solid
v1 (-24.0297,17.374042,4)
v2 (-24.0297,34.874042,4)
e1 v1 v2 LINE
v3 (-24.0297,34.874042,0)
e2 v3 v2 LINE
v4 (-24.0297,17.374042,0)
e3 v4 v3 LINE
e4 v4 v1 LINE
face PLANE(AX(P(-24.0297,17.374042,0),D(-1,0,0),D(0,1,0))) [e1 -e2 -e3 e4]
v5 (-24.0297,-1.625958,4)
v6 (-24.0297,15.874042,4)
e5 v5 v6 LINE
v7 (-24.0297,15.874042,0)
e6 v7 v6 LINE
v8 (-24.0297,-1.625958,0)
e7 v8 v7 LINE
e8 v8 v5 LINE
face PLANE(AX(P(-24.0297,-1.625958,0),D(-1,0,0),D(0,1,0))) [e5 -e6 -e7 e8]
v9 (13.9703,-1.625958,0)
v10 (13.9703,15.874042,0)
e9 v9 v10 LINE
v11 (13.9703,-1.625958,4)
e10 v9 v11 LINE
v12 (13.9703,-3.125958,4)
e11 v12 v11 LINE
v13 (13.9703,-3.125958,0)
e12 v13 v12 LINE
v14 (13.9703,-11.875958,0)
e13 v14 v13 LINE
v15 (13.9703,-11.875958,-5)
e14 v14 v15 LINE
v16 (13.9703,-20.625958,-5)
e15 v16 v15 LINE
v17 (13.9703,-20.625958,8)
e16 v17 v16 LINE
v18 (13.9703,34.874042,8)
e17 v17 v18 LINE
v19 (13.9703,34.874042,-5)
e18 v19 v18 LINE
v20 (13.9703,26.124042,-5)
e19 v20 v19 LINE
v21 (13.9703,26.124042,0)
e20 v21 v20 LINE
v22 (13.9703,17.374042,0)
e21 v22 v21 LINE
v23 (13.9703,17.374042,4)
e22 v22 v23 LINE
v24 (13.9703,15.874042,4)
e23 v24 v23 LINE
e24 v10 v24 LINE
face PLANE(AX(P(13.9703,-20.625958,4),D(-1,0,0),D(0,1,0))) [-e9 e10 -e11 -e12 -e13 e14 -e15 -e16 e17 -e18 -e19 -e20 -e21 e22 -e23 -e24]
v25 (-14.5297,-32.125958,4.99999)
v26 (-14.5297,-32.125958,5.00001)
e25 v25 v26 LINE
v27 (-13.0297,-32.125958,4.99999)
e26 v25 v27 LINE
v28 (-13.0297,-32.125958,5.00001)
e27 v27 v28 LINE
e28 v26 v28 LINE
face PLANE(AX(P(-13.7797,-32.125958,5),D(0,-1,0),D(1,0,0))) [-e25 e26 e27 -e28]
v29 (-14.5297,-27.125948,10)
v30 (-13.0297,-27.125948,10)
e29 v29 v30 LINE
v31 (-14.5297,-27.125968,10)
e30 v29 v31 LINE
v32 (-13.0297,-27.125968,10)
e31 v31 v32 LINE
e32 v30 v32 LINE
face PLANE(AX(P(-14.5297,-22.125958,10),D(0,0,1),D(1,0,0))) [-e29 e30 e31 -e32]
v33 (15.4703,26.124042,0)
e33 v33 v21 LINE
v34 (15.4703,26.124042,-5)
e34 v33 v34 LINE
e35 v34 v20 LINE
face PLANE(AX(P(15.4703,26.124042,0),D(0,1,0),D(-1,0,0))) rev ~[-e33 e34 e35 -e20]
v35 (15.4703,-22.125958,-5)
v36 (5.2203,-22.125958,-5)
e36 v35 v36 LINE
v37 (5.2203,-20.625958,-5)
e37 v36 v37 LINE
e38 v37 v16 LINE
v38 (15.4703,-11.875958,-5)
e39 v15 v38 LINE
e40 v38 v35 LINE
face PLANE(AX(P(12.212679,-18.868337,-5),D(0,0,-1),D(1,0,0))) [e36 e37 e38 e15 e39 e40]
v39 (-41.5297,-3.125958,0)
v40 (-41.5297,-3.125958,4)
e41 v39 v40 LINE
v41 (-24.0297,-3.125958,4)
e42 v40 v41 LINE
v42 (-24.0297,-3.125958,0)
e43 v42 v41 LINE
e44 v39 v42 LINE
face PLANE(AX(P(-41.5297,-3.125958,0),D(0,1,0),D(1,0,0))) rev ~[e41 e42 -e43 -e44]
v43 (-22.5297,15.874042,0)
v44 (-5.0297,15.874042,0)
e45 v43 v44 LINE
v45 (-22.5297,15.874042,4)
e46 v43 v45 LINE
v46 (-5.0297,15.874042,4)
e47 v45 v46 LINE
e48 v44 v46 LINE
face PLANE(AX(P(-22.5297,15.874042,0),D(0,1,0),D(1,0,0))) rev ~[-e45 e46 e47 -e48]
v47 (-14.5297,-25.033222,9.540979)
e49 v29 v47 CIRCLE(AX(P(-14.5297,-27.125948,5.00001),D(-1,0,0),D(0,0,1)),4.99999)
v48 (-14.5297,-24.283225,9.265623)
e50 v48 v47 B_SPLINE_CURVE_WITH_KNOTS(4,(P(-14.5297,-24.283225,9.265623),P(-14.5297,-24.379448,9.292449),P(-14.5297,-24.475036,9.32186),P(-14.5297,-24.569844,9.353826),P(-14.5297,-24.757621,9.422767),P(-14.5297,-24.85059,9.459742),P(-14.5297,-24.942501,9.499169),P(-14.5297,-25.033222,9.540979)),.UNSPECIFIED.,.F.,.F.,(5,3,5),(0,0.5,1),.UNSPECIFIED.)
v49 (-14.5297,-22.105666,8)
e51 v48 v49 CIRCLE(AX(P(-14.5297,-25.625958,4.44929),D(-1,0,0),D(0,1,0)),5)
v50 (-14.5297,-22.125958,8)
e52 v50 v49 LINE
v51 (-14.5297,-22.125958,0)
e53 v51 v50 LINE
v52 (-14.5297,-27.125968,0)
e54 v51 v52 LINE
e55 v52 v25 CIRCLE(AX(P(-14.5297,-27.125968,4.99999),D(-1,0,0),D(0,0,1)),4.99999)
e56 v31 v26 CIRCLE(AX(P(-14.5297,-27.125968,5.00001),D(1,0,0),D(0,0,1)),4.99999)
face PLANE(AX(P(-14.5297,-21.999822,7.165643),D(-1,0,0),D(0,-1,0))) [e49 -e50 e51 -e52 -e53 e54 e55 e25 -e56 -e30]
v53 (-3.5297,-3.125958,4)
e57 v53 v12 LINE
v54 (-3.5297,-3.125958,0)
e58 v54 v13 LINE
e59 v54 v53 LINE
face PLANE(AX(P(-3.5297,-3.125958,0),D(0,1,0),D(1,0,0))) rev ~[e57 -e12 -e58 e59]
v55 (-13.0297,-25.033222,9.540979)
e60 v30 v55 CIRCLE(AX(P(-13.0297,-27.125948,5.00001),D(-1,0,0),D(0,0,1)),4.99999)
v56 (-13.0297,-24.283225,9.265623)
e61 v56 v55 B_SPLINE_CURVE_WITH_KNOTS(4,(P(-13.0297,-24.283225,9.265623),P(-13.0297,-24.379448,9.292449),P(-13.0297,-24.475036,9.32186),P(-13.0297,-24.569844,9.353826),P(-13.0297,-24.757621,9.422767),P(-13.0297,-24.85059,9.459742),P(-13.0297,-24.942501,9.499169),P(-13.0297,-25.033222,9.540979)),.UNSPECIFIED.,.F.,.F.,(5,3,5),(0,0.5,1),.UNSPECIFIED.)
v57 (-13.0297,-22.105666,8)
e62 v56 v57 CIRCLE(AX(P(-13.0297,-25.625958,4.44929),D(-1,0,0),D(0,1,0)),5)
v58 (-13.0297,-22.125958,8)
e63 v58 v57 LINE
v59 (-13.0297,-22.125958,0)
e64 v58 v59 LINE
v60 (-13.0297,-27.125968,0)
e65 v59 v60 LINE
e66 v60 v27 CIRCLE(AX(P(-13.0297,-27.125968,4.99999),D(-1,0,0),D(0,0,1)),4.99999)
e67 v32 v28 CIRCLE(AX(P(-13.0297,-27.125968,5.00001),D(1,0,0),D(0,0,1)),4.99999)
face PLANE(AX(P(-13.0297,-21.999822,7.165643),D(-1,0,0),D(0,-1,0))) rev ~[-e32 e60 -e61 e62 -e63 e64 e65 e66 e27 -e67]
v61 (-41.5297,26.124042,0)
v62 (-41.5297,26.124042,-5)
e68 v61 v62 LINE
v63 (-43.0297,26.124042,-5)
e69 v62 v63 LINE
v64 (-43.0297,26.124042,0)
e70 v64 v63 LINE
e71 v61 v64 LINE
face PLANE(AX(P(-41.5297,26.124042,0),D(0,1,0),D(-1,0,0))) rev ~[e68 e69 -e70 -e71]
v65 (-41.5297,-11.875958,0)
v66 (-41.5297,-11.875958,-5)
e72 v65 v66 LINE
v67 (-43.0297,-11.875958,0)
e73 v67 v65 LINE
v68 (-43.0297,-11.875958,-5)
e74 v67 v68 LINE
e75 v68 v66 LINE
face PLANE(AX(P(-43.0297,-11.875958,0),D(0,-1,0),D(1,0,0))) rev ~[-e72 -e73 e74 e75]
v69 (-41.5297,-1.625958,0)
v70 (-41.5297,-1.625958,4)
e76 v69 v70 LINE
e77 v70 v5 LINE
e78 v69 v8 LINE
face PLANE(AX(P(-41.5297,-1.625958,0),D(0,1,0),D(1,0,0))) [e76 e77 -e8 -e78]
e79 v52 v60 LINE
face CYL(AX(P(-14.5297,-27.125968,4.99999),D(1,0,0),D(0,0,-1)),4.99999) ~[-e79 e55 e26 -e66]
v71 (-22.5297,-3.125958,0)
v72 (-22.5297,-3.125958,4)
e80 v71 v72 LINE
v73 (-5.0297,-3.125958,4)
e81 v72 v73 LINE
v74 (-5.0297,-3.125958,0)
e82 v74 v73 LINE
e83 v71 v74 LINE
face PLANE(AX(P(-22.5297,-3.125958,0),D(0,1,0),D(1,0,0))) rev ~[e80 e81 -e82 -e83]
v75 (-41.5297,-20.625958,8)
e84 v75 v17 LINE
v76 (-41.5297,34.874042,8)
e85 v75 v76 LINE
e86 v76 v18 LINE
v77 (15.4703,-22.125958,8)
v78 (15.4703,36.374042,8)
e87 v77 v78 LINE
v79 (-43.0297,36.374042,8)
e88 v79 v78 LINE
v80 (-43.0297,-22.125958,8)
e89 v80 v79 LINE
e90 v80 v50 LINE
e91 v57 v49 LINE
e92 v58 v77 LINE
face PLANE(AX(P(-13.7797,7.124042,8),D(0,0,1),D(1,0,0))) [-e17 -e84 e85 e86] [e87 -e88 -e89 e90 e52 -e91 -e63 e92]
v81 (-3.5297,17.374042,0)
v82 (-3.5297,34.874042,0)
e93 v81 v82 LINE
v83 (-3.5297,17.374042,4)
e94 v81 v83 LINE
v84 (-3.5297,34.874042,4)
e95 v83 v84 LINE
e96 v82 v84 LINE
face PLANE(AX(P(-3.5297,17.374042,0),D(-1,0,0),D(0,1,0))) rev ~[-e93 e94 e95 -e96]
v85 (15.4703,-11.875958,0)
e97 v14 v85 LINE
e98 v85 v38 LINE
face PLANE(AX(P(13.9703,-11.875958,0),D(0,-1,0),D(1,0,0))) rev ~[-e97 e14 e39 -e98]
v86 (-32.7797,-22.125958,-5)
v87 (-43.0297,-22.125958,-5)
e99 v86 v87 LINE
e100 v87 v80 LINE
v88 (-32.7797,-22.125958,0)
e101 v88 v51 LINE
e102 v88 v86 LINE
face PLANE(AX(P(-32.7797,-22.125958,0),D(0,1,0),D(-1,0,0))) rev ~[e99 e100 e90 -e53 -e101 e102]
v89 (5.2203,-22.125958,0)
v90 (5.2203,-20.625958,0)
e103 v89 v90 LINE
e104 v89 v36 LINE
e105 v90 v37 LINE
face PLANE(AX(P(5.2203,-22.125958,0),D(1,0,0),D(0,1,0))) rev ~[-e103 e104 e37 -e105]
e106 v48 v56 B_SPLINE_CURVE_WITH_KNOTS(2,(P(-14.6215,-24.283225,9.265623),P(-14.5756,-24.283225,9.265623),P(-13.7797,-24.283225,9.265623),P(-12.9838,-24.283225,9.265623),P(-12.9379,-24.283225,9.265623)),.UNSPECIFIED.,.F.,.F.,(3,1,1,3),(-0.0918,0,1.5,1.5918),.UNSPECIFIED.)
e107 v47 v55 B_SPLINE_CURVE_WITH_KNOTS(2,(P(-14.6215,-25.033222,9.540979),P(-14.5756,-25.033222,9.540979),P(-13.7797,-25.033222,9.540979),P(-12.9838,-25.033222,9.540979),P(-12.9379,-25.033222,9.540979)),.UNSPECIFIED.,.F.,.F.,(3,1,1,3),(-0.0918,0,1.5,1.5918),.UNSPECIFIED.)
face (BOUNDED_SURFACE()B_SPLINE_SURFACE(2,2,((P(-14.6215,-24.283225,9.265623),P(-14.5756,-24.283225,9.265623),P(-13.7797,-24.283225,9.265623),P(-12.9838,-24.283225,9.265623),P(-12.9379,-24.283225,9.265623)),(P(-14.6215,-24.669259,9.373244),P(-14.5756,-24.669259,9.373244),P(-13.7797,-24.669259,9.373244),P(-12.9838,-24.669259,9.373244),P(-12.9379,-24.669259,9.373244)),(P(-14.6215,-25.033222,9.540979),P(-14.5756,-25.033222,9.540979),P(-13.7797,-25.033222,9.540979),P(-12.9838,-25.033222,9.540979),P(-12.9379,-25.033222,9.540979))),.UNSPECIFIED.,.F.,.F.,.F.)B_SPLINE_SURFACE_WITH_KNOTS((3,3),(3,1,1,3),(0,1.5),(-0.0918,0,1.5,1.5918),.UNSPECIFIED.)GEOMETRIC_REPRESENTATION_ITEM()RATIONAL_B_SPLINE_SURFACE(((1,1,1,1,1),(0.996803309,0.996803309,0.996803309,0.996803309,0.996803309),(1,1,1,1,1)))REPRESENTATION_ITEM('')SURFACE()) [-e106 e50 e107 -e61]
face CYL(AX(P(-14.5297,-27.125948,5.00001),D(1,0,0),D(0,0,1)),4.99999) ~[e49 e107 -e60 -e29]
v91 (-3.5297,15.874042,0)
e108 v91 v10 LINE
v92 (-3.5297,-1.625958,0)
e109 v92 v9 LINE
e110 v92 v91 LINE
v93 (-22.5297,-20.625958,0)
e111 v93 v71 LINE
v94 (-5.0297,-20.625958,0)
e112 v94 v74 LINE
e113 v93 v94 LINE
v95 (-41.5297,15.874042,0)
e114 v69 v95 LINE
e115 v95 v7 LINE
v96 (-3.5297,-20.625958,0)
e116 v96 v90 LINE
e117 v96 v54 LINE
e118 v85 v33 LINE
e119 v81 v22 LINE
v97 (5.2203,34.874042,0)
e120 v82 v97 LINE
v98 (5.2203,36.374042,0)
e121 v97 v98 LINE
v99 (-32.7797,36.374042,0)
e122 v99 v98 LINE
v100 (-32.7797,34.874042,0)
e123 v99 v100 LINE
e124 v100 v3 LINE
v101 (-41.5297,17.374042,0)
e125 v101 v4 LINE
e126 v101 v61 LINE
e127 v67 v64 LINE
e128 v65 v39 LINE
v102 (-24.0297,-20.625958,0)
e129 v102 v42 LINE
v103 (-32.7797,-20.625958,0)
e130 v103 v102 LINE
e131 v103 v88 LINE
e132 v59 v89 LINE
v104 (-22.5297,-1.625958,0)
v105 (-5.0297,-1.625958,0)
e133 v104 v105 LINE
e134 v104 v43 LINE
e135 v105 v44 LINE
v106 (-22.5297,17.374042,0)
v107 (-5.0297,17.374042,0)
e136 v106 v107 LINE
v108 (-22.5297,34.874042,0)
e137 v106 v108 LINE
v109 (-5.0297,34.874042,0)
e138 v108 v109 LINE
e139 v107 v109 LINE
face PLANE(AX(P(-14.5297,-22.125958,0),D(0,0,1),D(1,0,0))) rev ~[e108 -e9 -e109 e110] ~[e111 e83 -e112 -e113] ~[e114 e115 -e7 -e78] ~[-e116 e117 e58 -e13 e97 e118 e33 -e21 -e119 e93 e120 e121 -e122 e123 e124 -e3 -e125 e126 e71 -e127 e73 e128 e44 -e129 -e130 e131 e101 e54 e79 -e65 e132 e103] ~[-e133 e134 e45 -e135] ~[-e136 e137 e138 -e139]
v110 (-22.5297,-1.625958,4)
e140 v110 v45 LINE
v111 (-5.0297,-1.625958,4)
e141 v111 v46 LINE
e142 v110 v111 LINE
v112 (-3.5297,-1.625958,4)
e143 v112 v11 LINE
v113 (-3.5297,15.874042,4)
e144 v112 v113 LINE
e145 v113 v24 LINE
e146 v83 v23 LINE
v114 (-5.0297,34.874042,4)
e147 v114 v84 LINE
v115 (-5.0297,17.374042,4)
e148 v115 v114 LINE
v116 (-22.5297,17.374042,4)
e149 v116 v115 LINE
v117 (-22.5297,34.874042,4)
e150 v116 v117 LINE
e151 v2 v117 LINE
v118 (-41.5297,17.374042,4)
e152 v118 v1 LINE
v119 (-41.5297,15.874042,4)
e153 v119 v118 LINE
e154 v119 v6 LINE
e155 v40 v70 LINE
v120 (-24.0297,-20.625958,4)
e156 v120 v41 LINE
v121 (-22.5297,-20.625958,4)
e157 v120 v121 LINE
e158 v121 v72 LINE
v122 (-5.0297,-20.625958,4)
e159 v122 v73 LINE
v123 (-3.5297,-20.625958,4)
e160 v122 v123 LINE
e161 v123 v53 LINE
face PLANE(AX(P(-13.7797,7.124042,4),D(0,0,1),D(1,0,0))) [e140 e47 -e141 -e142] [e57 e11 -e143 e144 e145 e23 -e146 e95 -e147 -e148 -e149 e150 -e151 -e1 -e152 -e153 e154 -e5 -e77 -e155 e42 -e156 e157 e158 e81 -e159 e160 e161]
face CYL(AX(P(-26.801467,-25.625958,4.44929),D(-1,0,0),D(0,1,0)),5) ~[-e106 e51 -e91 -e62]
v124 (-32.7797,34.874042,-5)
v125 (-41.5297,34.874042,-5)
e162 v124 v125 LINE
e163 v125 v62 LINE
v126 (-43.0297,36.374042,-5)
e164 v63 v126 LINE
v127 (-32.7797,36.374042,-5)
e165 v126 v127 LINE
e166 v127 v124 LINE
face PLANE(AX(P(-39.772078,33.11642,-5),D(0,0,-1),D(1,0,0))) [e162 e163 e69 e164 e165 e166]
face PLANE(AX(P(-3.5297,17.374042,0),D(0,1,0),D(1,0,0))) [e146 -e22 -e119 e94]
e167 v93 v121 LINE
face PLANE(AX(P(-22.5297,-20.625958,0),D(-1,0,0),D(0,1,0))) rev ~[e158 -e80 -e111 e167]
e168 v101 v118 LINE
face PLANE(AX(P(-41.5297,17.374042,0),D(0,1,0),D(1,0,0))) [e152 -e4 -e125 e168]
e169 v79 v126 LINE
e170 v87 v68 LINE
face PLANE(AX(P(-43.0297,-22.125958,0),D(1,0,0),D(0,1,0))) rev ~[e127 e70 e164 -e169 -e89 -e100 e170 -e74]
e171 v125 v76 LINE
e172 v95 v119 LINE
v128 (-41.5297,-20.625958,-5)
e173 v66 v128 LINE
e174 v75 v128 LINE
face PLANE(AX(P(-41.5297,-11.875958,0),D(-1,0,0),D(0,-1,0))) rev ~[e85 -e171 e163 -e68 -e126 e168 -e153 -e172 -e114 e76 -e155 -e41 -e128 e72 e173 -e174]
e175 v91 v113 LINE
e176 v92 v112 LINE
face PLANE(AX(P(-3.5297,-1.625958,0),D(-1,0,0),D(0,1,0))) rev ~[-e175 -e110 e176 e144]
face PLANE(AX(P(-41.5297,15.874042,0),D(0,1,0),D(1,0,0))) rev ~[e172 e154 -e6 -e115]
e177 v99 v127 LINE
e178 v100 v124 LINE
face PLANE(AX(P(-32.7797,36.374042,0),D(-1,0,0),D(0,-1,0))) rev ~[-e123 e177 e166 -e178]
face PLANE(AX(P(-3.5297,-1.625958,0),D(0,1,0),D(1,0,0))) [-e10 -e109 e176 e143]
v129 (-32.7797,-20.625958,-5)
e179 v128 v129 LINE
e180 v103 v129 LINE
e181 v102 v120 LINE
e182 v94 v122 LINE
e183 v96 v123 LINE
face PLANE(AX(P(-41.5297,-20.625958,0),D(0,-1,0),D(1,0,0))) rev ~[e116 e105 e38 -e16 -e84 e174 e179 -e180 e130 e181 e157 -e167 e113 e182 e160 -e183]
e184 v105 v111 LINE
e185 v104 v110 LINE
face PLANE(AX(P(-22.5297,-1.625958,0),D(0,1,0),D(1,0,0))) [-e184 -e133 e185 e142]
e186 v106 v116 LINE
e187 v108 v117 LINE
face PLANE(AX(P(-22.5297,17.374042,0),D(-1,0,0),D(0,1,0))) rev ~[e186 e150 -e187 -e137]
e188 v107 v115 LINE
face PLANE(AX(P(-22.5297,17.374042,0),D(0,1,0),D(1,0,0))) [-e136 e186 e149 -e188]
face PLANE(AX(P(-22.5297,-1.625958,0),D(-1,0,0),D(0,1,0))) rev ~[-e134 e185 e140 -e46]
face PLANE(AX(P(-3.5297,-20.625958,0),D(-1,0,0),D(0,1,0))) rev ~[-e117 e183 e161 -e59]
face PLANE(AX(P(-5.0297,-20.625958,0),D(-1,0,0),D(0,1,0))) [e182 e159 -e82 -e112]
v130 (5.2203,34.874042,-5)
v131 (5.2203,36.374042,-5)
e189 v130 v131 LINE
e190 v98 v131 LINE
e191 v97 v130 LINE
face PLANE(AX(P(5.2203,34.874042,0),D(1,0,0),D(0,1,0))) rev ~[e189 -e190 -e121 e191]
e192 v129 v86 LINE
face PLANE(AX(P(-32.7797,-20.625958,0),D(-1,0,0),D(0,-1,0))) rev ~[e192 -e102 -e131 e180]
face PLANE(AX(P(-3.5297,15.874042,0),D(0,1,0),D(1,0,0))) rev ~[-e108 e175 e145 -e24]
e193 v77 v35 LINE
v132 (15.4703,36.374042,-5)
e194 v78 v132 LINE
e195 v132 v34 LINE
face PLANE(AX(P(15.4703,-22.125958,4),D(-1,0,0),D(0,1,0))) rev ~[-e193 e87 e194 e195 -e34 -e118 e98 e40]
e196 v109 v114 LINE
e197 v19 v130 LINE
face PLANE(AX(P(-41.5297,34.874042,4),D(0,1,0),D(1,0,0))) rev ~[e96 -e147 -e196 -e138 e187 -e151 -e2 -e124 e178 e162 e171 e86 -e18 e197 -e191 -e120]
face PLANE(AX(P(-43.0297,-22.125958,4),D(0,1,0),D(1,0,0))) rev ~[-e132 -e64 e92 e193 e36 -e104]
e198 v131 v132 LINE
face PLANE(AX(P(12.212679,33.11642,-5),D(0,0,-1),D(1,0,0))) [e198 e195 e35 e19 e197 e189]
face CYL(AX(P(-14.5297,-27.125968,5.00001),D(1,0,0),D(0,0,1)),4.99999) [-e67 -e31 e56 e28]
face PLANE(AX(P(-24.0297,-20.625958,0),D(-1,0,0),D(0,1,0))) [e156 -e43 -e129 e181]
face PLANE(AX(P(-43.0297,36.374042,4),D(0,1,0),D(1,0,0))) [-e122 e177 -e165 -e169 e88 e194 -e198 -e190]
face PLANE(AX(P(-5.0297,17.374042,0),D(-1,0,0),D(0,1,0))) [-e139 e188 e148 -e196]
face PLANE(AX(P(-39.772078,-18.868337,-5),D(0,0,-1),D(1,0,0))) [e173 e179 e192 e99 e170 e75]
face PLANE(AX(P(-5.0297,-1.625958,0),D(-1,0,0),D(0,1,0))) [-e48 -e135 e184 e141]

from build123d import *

# Parameters (mm, degrees)
F0_W        = 58.5
F0_H        = 58.5
F0_W_2      = 17.5
F0_H_2      = 17.5
F1_DEPTH    = 4
F2_W        = 1.5
F2_H        = 10
F3_DEPTH    = 10
F4_R        = 4.99999
F6_DEPTH    = 1.5
F7_T1_DEPTH = 26.0435355486
F8_R        = 5
F9_W        = 58.5
F9_H        = 58.5
F9_W_2      = 55.5
F9_H_2      = 55.5
F10_DEPTH   = 4
F12_DEPTH   = 5


# Not quite as in the source:
# - a fillet or chamfer that OpenCascade refuses, or shapes differently, is made with other operations: its cross-section is extruded or revolved along the edge and cut away or added
# - a fillet or chamfer is up to 0.001 mm smaller than in the source, because OpenCascade refuses the exact size


with BuildPart() as f1:
    # F0 (on Top) → F1 (new body)
    with BuildSketch(Plane.XY):
        with Locations((-13.779699502, 7.1240415001)):
            Rectangle(F0_W, F0_H)
        with Locations((-32.779699502, -11.8759584999)):
            Rectangle(F0_W_2, F0_H_2, mode=Mode.SUBTRACT)
        with Locations((-13.779699502, -11.8759584999)):
            Rectangle(F0_W_2, F0_H_2, mode=Mode.SUBTRACT)
        with Locations((5.220300498, -11.8759584999)):
            Rectangle(F0_W_2, F0_H_2, mode=Mode.SUBTRACT)
        with Locations((-32.779699502, 7.1240415001)):
            Rectangle(F0_W_2, F0_H_2, mode=Mode.SUBTRACT)
        with Locations((-32.779699502, 26.1240415001)):
            Rectangle(F0_W_2, F0_H_2, mode=Mode.SUBTRACT)
        with Locations((-13.779699502, 7.1240415001)):
            Rectangle(F0_W_2, F0_H_2, mode=Mode.SUBTRACT)
        with Locations((5.220300498, 7.1240415001)):
            Rectangle(F0_W_2, F0_H_2, mode=Mode.SUBTRACT)
        with Locations((-13.779699502, 26.1240415001)):
            Rectangle(F0_W_2, F0_H_2, mode=Mode.SUBTRACT)
        with Locations((5.220300498, 26.1240415001)):
            Rectangle(F0_W_2, F0_H_2, mode=Mode.SUBTRACT)
    extrude(amount=F1_DEPTH)

    # F2 (on face) → F3 (join)
    with BuildSketch(Plane.XZ.offset(22.1259584999)):
        with Locations((-13.779699502, 5)):
            Rectangle(F2_W, F2_H)
    extrude(amount=F3_DEPTH)

    # F4 (radius 5 in the source; OpenCascade refuses exactly that, so slightly less here)
    f4_edges = [f1.edges().sort_by_distance(p)[0] for p in [
        (-13.7797, -32.125958, 10),
        (-13.7797, -32.125958, 0),
        (-13.7797, -22.125958, 10),
    ]]
    fillet(f4_edges, radius=F4_R)

    # F5 (on face) → F6 (join)
    with BuildSketch(Plane(origin=(-14.529699502, 0, 0), x_dir=(0, -1, 0), z_dir=(-1, 0, 0))):
        with BuildLine():
            Line((20.6259584999, 4), (22.1259584999, 4))
            Line((22.1259584999, 4), (22.1259584999, 5))
            ThreePointArc((22.1259584999, 5), (22.8099724149, 7.5243343902), (24.6748641453, 9.3579968409))
            Line((24.6748641453, 9.3579968409), (22.1259584999, 9.3579968409))
            Line((22.1259584999, 9.3579968409), (20.6259584999, 9.3579968409))
            Line((20.6259584999, 9.3579968409), (20.6259584999, 4))
        make_face()
    extrude(amount=-F6_DEPTH)

    # F7: fillet of radius 5 on 1 edges, made by hand

    # F7_s2 → F7_t1 (cut)
    with BuildSketch(Plane.YZ.offset(-26.8014672763)):
        with BuildLine():
            ThreePointArc((-20.6259584999, 4.4492897311), (-21.7687892868, 7.6308374145), (-24.6748567646, 9.3579968409))
            Line((-24.6748567646, 9.3579968409), (-24.6558347299, 9.4561709831))
            ThreePointArc((-24.6558347299, 9.4561709831), (-22.6504076323, 9.4579968409), (-20.6259584999, 9.4579968409))
            Line((-20.6259584999, 9.4579968409), (-20.5259584999, 9.3579968409))
            Line((-20.5259584999, 9.3579968409), (-20.5259584999, 4.4492897311))
            Line((-20.5259584999, 4.4492897311), (-20.6259584999, 4.4492897311))
        make_face()
    extrude(amount=F7_T1_DEPTH, mode=Mode.SUBTRACT)

    # F8
    f8_edges = [f1.edges().sort_by_distance(p)[0] for p in [
        (-13.7797, -24.674857, 9.357997),
    ]]
    fillet(f8_edges, radius=F8_R)

    # F9 (on face) → F10 (join)
    with BuildSketch(Plane.XY.offset(4)):
        with Locations((-13.779699502, 7.1240415001)):
            Rectangle(F9_W, F9_H)
        with Locations((-13.779699502, 7.1240415001)):
            Rectangle(F9_W_2, F9_H_2, mode=Mode.SUBTRACT)
    extrude(amount=F10_DEPTH)

    # F11 (on face) → F12 (join)
    with BuildSketch(Plane(origin=(0, 0, 0), x_dir=(1, 0, 0), z_dir=(0, 0, -1))):
        Polygon((-43.029699502, 11.8759584999), (-41.529699502, 11.8759584999), (-41.529699502, 20.6259584999), (-32.779699502, 20.6259584999), (-32.779699502, 22.1259584999), (-41.529699502, 22.1259584999), (-43.029699502, 22.1259584999), align=None)
        Polygon((5.220300498, 22.1259584999), (5.220300498, 20.6259584999), (13.970300498, 20.6259584999), (13.970300498, 11.8759584999), (15.470300498, 11.8759584999), (15.470300498, 22.1259584999), (13.970300498, 22.1259584999), align=None)
        Polygon((-43.029699502, -36.3740415001), (-32.779699502, -36.3740415001), (-32.779699502, -34.8740415001), (-41.529699502, -34.8740415001), (-41.529699502, -26.1240415001), (-43.029699502, -26.1240415001), (-43.029699502, -34.8740415001), align=None)
        Polygon((13.970300498, -34.8740415001), (5.220300498, -34.8740415001), (5.220300498, -36.3740415001), (15.470300498, -36.3740415001), (15.470300498, -34.8740415001), (15.470300498, -26.1240415001), (13.970300498, -26.1240415001), align=None)
    extrude(amount=F12_DEPTH)


solid = f1.part
